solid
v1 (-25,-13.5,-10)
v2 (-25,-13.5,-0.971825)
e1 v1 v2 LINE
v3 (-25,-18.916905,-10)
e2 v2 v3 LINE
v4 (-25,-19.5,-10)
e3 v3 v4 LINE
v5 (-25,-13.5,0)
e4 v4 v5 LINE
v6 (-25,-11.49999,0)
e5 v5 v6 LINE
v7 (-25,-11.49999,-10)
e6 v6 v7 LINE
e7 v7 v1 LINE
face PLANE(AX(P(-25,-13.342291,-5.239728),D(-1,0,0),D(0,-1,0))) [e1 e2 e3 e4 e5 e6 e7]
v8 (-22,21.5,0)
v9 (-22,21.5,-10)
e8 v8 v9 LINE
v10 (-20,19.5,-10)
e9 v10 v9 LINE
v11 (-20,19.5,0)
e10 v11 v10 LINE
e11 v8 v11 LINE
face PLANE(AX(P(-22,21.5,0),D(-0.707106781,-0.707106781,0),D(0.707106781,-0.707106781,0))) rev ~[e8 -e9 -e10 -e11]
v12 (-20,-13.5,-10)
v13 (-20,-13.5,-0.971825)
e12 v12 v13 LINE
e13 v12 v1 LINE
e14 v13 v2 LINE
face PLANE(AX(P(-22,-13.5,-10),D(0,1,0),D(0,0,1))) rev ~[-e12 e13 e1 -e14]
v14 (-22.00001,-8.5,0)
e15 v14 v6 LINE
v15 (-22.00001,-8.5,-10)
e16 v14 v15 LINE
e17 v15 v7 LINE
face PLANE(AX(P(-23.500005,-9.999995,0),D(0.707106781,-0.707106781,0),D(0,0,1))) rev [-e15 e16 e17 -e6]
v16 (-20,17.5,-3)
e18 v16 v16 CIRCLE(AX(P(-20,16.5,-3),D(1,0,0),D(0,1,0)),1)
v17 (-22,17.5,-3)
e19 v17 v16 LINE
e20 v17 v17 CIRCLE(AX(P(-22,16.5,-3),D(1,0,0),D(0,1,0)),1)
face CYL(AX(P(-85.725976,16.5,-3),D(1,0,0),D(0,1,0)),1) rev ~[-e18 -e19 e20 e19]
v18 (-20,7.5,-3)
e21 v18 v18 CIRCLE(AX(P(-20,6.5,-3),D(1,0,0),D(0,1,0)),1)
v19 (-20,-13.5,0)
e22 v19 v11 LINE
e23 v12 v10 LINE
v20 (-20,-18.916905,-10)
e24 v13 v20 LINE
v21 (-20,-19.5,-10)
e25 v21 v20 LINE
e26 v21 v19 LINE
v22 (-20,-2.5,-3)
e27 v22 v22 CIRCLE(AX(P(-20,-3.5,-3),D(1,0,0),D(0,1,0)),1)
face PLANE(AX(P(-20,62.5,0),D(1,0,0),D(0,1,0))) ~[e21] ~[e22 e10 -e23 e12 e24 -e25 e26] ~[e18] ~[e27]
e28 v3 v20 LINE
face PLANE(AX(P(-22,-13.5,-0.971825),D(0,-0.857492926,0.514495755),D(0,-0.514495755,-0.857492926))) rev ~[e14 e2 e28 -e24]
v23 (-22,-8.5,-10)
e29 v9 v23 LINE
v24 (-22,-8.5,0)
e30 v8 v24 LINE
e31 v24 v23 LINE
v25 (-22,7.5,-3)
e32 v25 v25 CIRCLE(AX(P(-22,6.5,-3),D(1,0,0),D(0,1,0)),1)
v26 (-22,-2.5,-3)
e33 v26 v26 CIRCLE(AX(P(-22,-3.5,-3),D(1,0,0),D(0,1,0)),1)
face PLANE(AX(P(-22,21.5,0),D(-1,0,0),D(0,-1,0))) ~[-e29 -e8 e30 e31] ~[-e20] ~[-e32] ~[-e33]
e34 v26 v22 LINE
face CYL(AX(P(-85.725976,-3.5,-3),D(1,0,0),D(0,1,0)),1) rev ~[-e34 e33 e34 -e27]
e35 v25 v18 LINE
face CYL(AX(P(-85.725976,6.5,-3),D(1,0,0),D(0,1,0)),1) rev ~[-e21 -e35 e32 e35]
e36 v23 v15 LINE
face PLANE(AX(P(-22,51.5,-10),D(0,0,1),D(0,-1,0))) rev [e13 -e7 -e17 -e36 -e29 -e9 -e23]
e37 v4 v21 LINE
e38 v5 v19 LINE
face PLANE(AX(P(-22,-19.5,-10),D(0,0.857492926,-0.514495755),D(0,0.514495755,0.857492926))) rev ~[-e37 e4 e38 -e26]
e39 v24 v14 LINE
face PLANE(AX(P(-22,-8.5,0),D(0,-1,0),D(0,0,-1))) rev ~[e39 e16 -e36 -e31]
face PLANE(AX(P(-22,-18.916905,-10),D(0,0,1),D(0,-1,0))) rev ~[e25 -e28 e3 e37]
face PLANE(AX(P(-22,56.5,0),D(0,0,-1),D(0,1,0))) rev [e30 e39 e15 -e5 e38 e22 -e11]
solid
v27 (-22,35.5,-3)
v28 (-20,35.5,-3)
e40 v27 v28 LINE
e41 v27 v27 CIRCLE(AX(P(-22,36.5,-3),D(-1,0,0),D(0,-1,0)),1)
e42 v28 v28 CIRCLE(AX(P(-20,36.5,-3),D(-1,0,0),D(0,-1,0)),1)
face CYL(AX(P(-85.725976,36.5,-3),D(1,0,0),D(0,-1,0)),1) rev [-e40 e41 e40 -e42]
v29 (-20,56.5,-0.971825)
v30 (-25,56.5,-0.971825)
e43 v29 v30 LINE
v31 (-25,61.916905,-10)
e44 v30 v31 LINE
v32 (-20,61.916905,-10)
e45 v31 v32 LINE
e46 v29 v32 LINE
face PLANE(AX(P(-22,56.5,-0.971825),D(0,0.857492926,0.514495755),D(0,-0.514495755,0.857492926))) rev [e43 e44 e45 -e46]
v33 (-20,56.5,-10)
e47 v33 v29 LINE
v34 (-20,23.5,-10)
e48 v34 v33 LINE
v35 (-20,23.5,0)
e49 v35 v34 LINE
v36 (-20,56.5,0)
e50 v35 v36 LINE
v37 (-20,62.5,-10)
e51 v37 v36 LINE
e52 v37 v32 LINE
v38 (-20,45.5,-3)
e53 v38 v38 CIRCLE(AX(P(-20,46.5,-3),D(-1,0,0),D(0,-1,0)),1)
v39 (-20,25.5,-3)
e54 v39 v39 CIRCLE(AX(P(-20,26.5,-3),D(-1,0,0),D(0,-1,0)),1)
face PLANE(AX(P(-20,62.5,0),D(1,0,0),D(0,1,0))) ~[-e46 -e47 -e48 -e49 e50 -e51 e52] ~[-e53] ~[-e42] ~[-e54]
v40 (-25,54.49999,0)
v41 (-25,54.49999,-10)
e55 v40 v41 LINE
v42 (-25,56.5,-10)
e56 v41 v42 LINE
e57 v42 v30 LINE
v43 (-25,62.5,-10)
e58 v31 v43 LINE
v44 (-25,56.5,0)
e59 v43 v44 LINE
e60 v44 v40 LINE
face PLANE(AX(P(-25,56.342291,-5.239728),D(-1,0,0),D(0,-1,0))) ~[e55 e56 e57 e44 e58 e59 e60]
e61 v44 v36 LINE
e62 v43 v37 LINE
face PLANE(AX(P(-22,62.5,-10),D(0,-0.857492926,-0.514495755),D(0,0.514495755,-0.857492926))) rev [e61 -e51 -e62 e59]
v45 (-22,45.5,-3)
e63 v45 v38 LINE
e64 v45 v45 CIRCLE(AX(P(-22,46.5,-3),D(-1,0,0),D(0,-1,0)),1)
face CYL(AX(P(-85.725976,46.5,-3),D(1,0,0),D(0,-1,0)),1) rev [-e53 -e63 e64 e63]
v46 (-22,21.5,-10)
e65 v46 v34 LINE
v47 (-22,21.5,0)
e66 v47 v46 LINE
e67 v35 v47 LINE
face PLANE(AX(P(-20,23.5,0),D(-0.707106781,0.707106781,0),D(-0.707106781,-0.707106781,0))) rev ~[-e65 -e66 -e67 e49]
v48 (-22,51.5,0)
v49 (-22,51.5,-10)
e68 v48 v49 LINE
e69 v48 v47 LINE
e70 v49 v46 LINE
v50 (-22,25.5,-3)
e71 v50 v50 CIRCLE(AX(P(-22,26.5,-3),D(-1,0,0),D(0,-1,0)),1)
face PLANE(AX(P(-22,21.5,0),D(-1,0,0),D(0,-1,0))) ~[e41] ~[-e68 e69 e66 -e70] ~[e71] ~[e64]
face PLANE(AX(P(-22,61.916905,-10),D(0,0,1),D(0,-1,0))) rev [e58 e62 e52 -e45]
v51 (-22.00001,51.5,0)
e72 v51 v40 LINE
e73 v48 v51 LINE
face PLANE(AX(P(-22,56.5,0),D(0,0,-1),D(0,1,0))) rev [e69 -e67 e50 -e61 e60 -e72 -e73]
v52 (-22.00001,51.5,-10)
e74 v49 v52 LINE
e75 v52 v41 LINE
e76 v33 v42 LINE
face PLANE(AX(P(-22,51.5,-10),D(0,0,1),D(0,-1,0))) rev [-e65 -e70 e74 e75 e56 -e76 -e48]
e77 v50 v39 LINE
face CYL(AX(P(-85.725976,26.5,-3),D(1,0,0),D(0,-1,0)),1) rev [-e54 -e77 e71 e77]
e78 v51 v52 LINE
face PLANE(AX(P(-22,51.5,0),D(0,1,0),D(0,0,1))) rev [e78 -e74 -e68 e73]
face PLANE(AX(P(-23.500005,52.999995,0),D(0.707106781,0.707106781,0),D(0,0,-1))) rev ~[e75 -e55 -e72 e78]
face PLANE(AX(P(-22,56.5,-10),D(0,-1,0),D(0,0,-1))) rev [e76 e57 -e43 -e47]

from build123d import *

# Parameters (mm, degrees)
F1_DEPTH  = 10
F2_W      = 2
F2_H      = 10
F3_DEPTH  = 25
F4_DEPTH  = 44.001
F6_DEPTH  = 41.001
F9_DEPTH  = 3
F10_SIZE  = 2.99999
F12_DEPTH = 3
F13_SIZE  = 2.99999
F16_D     = 2
F17_D     = 2
F18_DEPTH = 25
F21_DEPTH = 25


# Not quite as in the source:
# - a fillet or chamfer is up to 0.001 mm smaller than in the source, because OpenCascade refuses the exact size
# - a feature of the source that left no trace in its solid (it failed there, or was rolled back) is left out


with BuildPart() as f1:
    # F0 (on Top) → F1 (new body)
    with BuildSketch(Plane.XY):
        Polygon((-22, -19.5), (-20, -19.5), (-20, 19.5), (20, 19.5), (20, 21.5), (-22, 21.5), align=None)
        Polygon((20, 19.5), (20, -19.5), (-20, -19.5), (-22, -19.5), (-22, -21.5), (22, -21.5), (22, 21.5), (20, 21.5), align=None)
    extrude(amount=-F1_DEPTH)

    # F2 (on face) → F3 (cut)
    with BuildSketch(Plane(origin=(-22, 0, 0), x_dir=(0, -1, 0), z_dir=(-1, 0, 0))):
        Polygon((19.5, 0), (13.5, 0), (19.5, -10), align=None)
        with Locations((20.5, -5)):
            Rectangle(F2_W, F2_H)
        Polygon((13.5, -10), (18.9169048105, -10), (13.5, -0.9718253158), align=None)
    extrude(amount=-F3_DEPTH, mode=Mode.SUBTRACT)

    # F2 (on face) → F4 (cut, through all)
    with BuildSketch(Plane(origin=(-22, 0, 0), x_dir=(0, -1, 0), z_dir=(-1, 0, 0))):
        Polygon((19.5, 0), (13.5, 0), (19.5, -10), align=None)
        with Locations((20.5, -5)):
            Rectangle(F2_W, F2_H)
    extrude(amount=-F4_DEPTH, mode=Mode.SUBTRACT)

    # F5 (on face) → F6 (cut, through all)
    with BuildSketch(Plane(origin=(0, 21.5, 0), x_dir=(-1, 0, 0), z_dir=(0, 1, 0))):
        Polygon((-14, -0.9077913453), (-20, -10), (-14, -10), align=None)
        Polygon((-22, -10), (-20, -10), (-20, -9.0922086547), (-14, 0), (-22, 0), align=None)
    extrude(amount=-F6_DEPTH, mode=Mode.SUBTRACT)

    # F8 (on face) → F9 (join)
    with BuildSketch(Plane(origin=(0, 21.5, 0), x_dir=(-1, 0, 0), z_dir=(0, 1, 0))):
        Polygon((-14, -10), (-9, -10), (-9, 0), (-14, 0), (-20, -9.0922086547), (-20, -10), (-14, -0.9077913453), align=None)
    extrude(amount=F9_DEPTH)

    # F10 (size 3 in the source; OpenCascade refuses exactly that, so slightly less here)
    f10_edges = [f1.edges().sort_by_distance(p)[0] for p in [
        (9, 24.5, -5),
    ]]
    chamfer(f10_edges, length=F10_SIZE)

    # F11 (on face) → F12 (join)
    with BuildSketch(Plane(origin=(-22, 0, 0), x_dir=(0, -1, 0), z_dir=(-1, 0, 0))):
        Polygon((13.5, 0), (8.5, 0), (8.5, -10), (13.5, -10), (13.5, -0.9718253158), (18.9169048105, -10), (19.5, -10), align=None)
    extrude(amount=F12_DEPTH)

    # F13 (size 3 in the source; OpenCascade refuses exactly that, so slightly less here)
    f13_edges = [f1.edges().sort_by_distance(p)[0] for p in [
        (-25, -8.5, -5),
    ]]
    chamfer(f13_edges, length=F13_SIZE)

    # F16 (through all)
    with Locations(Plane(origin=(-22, 0, 0), x_dir=(0, -1, 0), z_dir=(-1, 0, 0))):
        with Locations((-6.5, -3), (3.5, -3), (-16.5, -3)):
            Hole(F16_D / 2)

    # F17 (through all)
    with Locations(Plane(origin=(0, 21.5, 0), x_dir=(-1, 0, 0), z_dir=(0, 1, 0))):
        with Locations((-3.5, -3), (6.5, -3), (16.5, -3)):
            Hole(F17_D / 2)

    # F18 (cut): a face of the model
    f18_faces = [f1.faces().sort_by_distance(p)[0] for p in [
        (-2.5776416517, 19.5, -5.0560962008),
    ]]
    extrude(f18_faces, amount=-F18_DEPTH, mode=Mode.SUBTRACT)

    # F19: F1 across face


with BuildPart() as f1_1:
    add(f1.part)
    add(f1.part.mirror(Plane(origin=(-21, 21.5, -5), x_dir=(-1, 0, 0), z_dir=(0, 1, 0))))

    # F20 (on face) → F21 (cut)
    with BuildSketch(Plane.XY):
        Polygon((-20, 23.5), (-22, 21.5), (-20, 19.5), align=None)
    extrude(amount=-F21_DEPTH, mode=Mode.SUBTRACT)


solid = f1_1.part
